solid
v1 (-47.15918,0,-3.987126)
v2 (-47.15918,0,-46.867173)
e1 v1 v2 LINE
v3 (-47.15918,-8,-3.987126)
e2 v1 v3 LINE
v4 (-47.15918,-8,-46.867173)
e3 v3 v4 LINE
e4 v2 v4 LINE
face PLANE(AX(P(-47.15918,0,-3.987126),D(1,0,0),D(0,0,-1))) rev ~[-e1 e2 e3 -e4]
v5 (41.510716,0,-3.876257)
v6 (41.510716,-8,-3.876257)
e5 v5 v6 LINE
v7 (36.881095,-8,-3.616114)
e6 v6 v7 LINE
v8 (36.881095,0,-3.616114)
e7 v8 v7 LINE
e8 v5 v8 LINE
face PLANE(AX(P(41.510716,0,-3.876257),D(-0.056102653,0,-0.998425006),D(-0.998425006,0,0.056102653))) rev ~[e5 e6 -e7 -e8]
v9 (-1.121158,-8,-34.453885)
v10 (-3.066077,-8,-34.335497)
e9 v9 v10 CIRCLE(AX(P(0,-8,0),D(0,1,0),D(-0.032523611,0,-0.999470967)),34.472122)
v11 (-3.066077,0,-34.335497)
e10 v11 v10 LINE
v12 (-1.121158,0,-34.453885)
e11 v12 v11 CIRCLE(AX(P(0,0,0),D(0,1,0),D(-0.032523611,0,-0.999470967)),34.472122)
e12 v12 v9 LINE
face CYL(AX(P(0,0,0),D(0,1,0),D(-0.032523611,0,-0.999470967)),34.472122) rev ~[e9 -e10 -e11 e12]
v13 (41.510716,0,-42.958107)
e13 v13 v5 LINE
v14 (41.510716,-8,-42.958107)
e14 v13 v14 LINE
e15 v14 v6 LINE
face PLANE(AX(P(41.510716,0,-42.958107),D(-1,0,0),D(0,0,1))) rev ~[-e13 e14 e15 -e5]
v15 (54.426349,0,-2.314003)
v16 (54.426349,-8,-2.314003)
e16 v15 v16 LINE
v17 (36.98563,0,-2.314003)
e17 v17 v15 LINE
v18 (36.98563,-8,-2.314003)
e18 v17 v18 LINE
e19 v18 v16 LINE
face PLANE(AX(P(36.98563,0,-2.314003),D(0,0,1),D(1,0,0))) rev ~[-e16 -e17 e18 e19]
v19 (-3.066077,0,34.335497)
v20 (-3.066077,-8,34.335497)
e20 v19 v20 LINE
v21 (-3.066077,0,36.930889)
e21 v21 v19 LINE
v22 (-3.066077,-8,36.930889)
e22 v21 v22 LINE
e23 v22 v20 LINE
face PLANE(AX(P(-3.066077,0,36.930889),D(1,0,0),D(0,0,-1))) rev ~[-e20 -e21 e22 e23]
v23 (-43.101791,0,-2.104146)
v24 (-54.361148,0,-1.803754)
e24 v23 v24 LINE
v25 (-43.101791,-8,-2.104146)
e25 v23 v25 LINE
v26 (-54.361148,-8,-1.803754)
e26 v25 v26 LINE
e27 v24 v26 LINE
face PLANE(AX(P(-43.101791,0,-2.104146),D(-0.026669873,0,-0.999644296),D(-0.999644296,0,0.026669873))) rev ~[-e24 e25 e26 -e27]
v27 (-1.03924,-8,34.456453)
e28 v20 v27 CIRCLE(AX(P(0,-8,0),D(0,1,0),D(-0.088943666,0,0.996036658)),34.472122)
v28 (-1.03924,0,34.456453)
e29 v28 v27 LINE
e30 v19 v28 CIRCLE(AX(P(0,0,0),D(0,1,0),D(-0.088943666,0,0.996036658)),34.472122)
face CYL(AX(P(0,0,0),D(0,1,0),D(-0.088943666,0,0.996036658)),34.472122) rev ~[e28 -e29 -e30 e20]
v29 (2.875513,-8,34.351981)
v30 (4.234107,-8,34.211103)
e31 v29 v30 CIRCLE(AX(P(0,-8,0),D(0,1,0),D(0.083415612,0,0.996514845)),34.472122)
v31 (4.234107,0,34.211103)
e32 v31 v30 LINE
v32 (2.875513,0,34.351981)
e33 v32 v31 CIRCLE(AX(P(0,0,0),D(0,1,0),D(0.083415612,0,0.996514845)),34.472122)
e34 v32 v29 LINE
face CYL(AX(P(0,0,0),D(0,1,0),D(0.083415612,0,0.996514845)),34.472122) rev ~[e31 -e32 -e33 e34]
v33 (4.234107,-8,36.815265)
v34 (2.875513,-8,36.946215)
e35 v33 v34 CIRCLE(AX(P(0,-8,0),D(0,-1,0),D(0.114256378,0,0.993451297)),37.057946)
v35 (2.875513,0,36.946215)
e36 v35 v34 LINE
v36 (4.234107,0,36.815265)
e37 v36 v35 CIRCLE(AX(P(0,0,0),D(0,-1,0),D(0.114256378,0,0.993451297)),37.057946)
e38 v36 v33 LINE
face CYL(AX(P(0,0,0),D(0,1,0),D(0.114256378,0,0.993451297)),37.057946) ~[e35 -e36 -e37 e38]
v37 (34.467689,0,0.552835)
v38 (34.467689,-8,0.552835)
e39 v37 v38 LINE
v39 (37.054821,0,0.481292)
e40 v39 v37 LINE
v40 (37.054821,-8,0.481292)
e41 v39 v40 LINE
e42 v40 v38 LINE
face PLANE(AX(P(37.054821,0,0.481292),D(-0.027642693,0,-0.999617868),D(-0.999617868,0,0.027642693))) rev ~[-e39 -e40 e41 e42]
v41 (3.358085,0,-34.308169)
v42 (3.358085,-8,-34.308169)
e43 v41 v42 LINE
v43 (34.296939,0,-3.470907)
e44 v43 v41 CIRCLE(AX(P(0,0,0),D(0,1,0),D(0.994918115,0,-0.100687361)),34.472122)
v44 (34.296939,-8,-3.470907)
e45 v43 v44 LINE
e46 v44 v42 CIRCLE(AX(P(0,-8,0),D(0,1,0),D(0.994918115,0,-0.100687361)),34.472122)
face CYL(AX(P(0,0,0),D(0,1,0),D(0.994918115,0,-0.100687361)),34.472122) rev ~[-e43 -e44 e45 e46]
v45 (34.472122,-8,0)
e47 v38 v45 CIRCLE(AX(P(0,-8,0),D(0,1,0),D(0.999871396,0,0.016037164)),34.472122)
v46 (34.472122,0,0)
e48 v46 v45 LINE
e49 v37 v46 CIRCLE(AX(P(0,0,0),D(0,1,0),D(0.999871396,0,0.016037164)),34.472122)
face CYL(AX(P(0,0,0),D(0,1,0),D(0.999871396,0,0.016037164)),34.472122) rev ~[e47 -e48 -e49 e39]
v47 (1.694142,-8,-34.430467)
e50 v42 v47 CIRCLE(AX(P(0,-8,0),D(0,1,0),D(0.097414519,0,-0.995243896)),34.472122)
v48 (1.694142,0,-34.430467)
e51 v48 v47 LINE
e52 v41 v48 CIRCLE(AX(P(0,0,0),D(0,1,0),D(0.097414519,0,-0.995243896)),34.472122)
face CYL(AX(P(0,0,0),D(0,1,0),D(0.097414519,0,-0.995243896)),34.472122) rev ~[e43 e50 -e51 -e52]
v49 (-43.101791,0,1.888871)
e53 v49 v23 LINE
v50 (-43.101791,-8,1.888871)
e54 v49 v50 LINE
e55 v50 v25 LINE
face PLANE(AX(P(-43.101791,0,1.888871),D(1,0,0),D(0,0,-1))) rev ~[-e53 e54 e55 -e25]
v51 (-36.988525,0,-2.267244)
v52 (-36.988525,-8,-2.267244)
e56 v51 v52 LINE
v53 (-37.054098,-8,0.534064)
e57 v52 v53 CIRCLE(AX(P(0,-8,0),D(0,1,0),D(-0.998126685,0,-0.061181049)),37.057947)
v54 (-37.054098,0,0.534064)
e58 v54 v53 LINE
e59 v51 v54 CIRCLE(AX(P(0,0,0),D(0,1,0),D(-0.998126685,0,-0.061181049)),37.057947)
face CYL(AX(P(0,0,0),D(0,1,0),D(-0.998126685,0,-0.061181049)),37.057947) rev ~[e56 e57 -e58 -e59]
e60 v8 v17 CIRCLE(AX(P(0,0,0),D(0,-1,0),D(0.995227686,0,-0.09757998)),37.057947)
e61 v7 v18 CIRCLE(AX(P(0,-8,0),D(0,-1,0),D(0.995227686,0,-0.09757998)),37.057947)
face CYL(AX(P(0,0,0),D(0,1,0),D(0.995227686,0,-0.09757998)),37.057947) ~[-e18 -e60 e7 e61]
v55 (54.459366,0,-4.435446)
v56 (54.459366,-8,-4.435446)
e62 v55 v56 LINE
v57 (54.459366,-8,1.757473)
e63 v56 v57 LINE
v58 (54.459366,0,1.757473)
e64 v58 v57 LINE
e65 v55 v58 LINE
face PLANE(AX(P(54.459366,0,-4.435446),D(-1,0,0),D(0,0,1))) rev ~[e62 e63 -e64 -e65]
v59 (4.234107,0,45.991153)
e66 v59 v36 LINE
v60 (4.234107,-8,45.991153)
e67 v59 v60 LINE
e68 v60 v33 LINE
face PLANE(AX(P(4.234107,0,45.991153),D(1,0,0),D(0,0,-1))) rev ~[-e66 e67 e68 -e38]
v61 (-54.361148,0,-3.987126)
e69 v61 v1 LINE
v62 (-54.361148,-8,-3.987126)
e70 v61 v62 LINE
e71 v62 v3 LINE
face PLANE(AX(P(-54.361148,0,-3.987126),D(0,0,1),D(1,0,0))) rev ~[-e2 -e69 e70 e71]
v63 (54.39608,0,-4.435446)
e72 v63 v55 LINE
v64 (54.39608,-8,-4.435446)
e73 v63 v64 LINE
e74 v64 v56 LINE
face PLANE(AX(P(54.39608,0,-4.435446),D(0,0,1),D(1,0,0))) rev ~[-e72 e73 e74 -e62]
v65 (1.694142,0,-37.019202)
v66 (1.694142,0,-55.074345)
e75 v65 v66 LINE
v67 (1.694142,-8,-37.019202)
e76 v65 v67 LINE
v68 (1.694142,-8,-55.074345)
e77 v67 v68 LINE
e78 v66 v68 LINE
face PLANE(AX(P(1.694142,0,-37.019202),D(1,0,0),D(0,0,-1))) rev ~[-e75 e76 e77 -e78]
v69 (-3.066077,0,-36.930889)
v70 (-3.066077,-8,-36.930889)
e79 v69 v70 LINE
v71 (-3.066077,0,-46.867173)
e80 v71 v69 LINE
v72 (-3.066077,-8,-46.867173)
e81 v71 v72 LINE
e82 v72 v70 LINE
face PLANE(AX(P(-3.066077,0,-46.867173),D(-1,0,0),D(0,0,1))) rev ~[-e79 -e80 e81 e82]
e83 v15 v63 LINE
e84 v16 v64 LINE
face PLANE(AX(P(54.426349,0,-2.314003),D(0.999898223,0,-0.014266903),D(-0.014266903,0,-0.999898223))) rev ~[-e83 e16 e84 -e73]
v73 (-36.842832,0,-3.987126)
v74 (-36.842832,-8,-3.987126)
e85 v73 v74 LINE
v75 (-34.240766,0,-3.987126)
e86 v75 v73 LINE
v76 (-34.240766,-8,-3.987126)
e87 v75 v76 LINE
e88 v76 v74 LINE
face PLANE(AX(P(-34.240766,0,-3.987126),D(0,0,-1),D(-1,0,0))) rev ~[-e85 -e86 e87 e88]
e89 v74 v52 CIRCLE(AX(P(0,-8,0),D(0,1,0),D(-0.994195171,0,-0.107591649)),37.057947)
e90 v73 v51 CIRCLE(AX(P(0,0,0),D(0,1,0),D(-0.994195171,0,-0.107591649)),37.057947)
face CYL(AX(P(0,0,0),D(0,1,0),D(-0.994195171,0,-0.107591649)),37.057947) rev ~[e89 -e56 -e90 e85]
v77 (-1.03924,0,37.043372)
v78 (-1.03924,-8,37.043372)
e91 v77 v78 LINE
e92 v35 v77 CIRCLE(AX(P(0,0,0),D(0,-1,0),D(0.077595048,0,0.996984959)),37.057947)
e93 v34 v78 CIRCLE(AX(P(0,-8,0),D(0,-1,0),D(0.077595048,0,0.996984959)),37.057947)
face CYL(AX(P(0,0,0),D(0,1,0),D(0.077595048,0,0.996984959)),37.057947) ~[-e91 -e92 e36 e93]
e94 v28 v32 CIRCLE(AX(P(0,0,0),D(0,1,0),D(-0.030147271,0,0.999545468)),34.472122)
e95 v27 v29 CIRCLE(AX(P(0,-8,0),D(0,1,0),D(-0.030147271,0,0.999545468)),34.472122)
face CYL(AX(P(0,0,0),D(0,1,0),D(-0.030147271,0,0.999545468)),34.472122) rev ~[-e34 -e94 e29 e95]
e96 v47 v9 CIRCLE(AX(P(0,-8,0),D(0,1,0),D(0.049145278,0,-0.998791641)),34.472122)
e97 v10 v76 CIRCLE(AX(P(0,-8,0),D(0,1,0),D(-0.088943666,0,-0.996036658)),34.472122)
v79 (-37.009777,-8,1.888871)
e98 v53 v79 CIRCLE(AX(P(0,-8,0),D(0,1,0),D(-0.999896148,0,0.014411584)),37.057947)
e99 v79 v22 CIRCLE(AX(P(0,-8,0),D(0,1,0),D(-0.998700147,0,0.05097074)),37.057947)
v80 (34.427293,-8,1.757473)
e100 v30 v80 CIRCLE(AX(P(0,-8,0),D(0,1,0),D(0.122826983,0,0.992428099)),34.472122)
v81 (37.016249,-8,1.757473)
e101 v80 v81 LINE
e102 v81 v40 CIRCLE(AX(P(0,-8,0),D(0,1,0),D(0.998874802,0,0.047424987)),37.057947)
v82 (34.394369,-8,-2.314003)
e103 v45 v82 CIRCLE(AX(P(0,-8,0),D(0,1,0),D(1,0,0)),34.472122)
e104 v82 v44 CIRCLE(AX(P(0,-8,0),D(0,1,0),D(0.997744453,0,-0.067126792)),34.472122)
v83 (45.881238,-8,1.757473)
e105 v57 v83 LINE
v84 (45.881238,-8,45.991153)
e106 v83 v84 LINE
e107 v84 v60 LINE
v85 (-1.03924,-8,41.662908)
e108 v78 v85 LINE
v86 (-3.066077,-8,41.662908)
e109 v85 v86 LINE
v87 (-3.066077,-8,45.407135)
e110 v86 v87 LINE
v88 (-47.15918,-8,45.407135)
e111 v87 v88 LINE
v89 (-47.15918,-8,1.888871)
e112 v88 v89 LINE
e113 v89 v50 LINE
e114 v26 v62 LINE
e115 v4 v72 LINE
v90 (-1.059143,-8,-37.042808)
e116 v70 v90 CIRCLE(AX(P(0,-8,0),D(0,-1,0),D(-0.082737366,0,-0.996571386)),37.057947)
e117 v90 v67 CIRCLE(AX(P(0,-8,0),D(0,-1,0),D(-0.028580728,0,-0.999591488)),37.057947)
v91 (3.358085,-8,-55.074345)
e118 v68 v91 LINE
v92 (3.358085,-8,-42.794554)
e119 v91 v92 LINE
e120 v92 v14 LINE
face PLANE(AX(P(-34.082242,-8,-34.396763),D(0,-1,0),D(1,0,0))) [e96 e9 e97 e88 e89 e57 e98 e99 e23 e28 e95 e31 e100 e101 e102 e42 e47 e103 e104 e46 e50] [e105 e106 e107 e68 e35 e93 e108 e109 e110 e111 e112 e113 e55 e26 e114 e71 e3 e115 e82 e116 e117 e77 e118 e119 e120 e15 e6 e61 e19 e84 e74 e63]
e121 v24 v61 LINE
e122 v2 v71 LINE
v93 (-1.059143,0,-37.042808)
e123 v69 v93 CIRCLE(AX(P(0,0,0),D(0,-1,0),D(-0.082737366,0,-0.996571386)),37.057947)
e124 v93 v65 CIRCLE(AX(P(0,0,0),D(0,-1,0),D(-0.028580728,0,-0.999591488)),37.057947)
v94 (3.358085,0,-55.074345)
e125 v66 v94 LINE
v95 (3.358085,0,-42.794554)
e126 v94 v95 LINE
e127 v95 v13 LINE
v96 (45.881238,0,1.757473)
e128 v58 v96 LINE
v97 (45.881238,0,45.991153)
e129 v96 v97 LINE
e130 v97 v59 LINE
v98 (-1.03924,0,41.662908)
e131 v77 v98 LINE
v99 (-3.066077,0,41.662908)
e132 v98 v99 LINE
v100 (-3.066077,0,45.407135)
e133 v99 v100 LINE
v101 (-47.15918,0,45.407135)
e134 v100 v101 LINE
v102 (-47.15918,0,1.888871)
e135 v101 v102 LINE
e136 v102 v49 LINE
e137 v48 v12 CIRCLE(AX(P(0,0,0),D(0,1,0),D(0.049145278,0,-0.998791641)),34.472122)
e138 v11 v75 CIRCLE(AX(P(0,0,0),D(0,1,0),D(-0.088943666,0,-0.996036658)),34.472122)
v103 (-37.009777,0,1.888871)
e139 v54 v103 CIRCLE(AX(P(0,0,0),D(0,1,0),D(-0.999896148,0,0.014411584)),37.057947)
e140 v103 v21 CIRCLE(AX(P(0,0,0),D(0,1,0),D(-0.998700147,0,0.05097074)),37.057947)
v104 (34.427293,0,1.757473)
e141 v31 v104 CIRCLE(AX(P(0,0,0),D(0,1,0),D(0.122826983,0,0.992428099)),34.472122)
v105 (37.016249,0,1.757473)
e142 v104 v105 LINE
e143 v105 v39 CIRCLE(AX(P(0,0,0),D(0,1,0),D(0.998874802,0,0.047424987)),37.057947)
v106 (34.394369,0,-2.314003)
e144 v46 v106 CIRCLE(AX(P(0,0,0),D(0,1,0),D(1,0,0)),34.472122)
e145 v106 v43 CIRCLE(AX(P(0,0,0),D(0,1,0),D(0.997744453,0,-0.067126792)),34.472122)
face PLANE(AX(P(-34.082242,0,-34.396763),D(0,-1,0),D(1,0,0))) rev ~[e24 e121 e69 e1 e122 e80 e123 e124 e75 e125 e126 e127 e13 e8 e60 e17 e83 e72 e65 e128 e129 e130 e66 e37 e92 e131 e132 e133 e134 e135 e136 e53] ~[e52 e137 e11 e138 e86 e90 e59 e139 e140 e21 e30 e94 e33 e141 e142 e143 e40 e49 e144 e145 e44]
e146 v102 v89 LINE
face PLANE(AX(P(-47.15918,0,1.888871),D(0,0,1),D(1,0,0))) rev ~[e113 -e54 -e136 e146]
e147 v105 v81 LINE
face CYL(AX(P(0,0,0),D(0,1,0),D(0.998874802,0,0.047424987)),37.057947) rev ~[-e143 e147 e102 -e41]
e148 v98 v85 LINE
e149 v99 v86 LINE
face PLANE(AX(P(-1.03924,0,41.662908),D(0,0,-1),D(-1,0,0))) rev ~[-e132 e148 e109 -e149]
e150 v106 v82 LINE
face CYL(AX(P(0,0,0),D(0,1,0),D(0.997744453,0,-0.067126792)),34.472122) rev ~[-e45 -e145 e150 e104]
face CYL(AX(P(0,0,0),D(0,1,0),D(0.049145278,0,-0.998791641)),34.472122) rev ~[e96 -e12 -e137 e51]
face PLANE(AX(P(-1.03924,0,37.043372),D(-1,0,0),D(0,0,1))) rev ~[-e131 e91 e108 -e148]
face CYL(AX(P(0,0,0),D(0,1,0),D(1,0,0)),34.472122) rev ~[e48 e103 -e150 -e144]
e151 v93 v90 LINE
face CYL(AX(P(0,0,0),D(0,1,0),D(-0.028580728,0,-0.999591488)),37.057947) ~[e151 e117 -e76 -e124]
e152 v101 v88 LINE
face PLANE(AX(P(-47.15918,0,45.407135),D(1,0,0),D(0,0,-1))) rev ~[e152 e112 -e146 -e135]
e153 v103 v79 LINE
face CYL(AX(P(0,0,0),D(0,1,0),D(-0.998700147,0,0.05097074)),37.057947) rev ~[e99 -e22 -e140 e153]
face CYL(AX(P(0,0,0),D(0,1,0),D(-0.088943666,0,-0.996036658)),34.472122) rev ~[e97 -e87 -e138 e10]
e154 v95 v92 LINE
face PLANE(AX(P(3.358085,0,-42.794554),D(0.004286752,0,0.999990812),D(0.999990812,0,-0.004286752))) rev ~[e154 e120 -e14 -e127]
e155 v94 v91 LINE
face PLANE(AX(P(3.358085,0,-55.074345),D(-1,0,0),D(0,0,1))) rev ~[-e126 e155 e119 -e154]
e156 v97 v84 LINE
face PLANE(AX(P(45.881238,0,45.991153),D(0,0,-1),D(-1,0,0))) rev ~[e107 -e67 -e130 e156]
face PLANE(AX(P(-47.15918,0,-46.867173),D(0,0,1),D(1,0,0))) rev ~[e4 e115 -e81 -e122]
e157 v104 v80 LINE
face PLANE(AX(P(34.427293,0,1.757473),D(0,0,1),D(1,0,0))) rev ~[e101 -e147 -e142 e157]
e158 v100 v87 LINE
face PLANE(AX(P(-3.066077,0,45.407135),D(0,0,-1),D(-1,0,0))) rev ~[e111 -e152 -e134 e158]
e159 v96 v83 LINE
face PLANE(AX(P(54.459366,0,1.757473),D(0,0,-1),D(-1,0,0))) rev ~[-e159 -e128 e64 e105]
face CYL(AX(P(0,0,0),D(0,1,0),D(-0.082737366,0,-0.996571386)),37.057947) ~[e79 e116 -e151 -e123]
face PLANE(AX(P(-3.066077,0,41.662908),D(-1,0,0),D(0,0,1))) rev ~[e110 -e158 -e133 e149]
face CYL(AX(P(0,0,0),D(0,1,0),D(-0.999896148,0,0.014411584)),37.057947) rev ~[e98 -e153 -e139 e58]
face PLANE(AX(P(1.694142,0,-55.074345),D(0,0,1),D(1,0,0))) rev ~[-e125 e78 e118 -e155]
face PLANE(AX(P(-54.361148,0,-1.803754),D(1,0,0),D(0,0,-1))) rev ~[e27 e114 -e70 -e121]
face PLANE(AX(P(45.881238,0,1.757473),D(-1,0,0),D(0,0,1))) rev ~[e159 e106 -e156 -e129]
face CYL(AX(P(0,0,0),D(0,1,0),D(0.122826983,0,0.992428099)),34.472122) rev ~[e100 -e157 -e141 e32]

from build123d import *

# Parameters (mm, degrees)
F1_DEPTH = 8


with BuildPart() as f1:
    # F0 (on Front) → F1 (new body)
    with BuildSketch(Plane.XZ):
        Polygon((-47.1591800451, -3.9871255867), (-47.1591800451, -46.8671731651), (-3.0660768971, -46.8671731651), (-3.0660768971, -42.9581068456), (-43.1017912924, -42.9581068456), (-43.1017912924, -3.9871255867), align=None)
        Polygon((-54.3611483469, -3.9871255867), (-47.1591800451, -3.9871255867), (-43.1017912924, -3.9871255867), (-43.1017912924, -2.1041460184), (-54.3611483469, -1.8037535483), align=None)
        with BuildLine():
            Line((-43.1017912924, -42.9581068456), (-3.0660768971, -42.9581068456))
            Line((-3.0660768971, -42.9581068456), (-3.0660768971, -36.9308893154))
            ThreePointArc((-3.0660768971, -36.9308893154), (-25.8747586881, -26.5290081986), (-36.8428316328, -3.9871255867))
            Line((-36.8428316328, -3.9871255867), (-43.1017912924, -3.9871255867))
            Line((-43.1017912924, -3.9871255867), (-43.1017912924, -42.9581068456))
        make_face()
        with BuildLine():
            Line((-43.1017912924, -2.1041460184), (-43.1017912924, -3.9871255867))
            Line((-43.1017912924, -3.9871255867), (-36.8428316328, -3.9871255867))
            ThreePointArc((-36.8428316328, -3.9871255867), (-36.9256932446, -3.12803318), (-36.9885254852, -2.2672440539))
            Line((-36.9885254852, -2.2672440539), (-43.1017912924, -2.1041460184))
        make_face()
        with BuildLine():
            ThreePointArc((-36.8428316328, -3.9871255867), (-25.8747586881, -26.5290081986), (-3.0660768971, -36.9308893154))
            Line((-3.0660768971, -36.9308893154), (-3.0660768971, -34.3354971844))
            ThreePointArc((-3.0660768971, -34.3354971844), (-24.0459151958, -24.7006306971), (-34.2407655288, -3.9871255867))
            Line((-34.2407655288, -3.9871255867), (-36.8428316328, -3.9871255867))
        make_face()
        with BuildLine():
            Line((-3.0660768971, -34.3354971844), (-3.0660768971, -36.9308893154))
            ThreePointArc((-3.0660768971, -36.9308893154), (-2.0633689571, -37.0004583987), (-1.0591430979, -37.0428080613))
            Line((-1.0591430979, -37.0428080613), (-1.1211578882, -34.4538851137))
            ThreePointArc((-1.1211578882, -34.4538851137), (-2.0944540368, -34.4084358367), (-3.0660768971, -34.3354971844))
        make_face()
        with BuildLine():
            Line((-43.1017912924, 0.534063729), (-43.1017912924, -2.1041460184))
            Line((-43.1017912924, -2.1041460184), (-36.9885254852, -2.2672440539))
            ThreePointArc((-36.9885254852, -2.2672440539), (-37.0477983113, -0.867210155), (-37.0540981418, 0.534063729))
            Line((-37.0540981418, 0.534063729), (-43.1017912924, 0.534063729))
        make_face()
        with BuildLine():
            Line((-1.1211578882, -34.4538851137), (-1.0591430979, -37.0428080613))
            ThreePointArc((-1.0591430979, -37.0428080613), (0.3177187709, -37.0565846774), (1.6941420035, -37.0192017207))
            Line((1.6941420035, -37.0192017207), (1.6941420035, -34.4304672828))
            ThreePointArc((1.6941420035, -34.4304672828), (0.2867312292, -34.4709294862), (-1.1211578882, -34.4538851137))
        make_face()
        with BuildLine():
            Line((-43.1017912924, 1.8888709601), (-43.1017912924, 0.534063729))
            Line((-43.1017912924, 0.534063729), (-37.0540981418, 0.534063729))
            ThreePointArc((-37.0540981418, 0.534063729), (-37.0381326331, 1.2116700136), (-37.0097768119, 1.8888709601))
            Line((-37.0097768119, 1.8888709601), (-43.1017912924, 1.8888709601))
        make_face()
        with BuildLine():
            ThreePointArc((3.3580851741, -36.9054830226), (2.5267534207, -36.9717044551), (1.6941420035, -37.0192017207))
            Line((1.6941420035, -37.0192017207), (1.6941420035, -55.0743453205))
            Line((1.6941420035, -55.0743453205), (3.3580851741, -55.0743453205))
            Line((3.3580851741, -55.0743453205), (3.3580851741, -46.8671731651))
            Line((3.3580851741, -46.8671731651), (3.3580851741, -42.7945544943))
            Line((3.3580851741, -42.7945544943), (3.3580851741, -36.9054830226))
        make_face()
        with BuildLine():
            Line((1.6941420035, -34.4304672828), (1.6941420035, -37.0192017207))
            ThreePointArc((1.6941420035, -37.0192017207), (2.5267534207, -36.9717044551), (3.3580851741, -36.9054830226))
            Line((3.3580851741, -36.9054830226), (3.3580851741, -34.3081689748))
            ThreePointArc((3.3580851741, -34.3081689748), (2.5268535934, -34.3793863435), (1.6941420035, -34.4304672828))
        make_face()
        Polygon((-47.1591800451, 1.8888709601), (-43.1017912924, 1.8888709601), (-43.1017912924, 41.1945804954), (-43.1017912924, 41.6629081592), (-3.0660768971, 41.6629081592), (-3.0660768971, 45.4071350396), (-47.1591800451, 45.4071350396), align=None)
        with BuildLine():
            Line((-43.1017912924, 41.1945804954), (-43.1017912924, 1.8888709601))
            Line((-43.1017912924, 1.8888709601), (-37.0097768119, 1.8888709601))
            ThreePointArc((-37.0097768119, 1.8888709601), (-26.6177436164, 25.7834663678), (-3.0660768971, 36.9308893154))
            Line((-3.0660768971, 36.9308893154), (-3.0660768971, 41.6629081592))
            Line((-3.0660768971, 41.6629081592), (-43.1017912924, 41.6629081592))
            Line((-43.1017912924, 41.6629081592), (-43.1017912924, 41.1945804954))
        make_face()
        with BuildLine():
            ThreePointArc((36.8810945474, -3.6161136812), (26.1121317389, -26.295398632), (3.3580851741, -36.9054830226))
            Line((3.3580851741, -36.9054830226), (3.3580851741, -42.7945544943))
            Line((3.3580851741, -42.7945544943), (41.5107160807, -42.9581068456))
            Line((41.5107160807, -42.9581068456), (41.5107160807, -3.876257455))
            Line((41.5107160807, -3.876257455), (36.8810945474, -3.6161136813))
        make_face()
        with BuildLine():
            Line((3.3580851741, -34.3081689748), (3.3580851741, -36.9054830226))
            ThreePointArc((3.3580851741, -36.9054830226), (26.1121317389, -26.295398632), (36.8810945474, -3.6161136812))
            Line((36.8810945474, -3.6161136813), (34.2969386269, -3.4709069795))
            ThreePointArc((34.2969386269, -3.4709069795), (24.3353526008, -24.4155239189), (3.3580851741, -34.3081689748))
        make_face()
        with BuildLine():
            Line((34.2969386269, -3.4709069795), (36.8810945474, -3.6161136813))
            ThreePointArc((36.8810945474, -3.6161136812), (36.9391000222, -2.9655189628), (36.9856296892, -2.3140029516))
            Line((36.9856296892, -2.3140029516), (34.3943685039, -2.3140029516))
            ThreePointArc((34.3943685039, -2.3140029516), (34.3505243856, -2.8928651668), (34.2969386269, -3.4709069795))
        make_face()
        with BuildLine():
            ThreePointArc((-1.0392403929, 37.0433717765), (-2.0534289831, 37.0010113724), (-3.0660768971, 36.9308893154))
            Line((-3.0660768971, 36.9308893154), (-3.0660768971, 34.3354971844))
            ThreePointArc((-3.0660768971, 34.3354971844), (-2.0535493927, 34.4109013153), (-1.0392403929, 34.4564532976))
            Line((-1.0392403929, 34.4564532976), (-1.0392403929, 37.0433717765))
        make_face()
        with BuildLine():
            Line((-3.0660768971, 41.6629081592), (-3.0660768971, 36.9308893154))
            ThreePointArc((-3.0660768971, 36.9308893154), (-2.0534289831, 37.0010113724), (-1.0392403929, 37.0433717765))
            Line((-1.0392403929, 37.0433717765), (-1.0392403929, 41.6629081592))
            Line((-1.0392403929, 41.6629081592), (-3.0660768971, 41.6629081592))
        make_face()
        with BuildLine():
            Line((34.3943685039, -2.3140029516), (36.9856296892, -2.3140029516))
            ThreePointArc((36.9856296892, -2.3140029516), (37.0398630305, -1.157566349), (37.0579466939, 0))
            ThreePointArc((37.0579466939, 0), (37.0571653007, 0.2406512887), (37.0548211541, 0.4812924287))
            Line((37.0548211541, 0.4812924287), (34.4676887508, 0.5528350755))
            ThreePointArc((34.4676887508, 0.5528350755), (34.4710136618, 0.2764264252), (34.4721219892, 0))
            ThreePointArc((34.4721219892, 0), (34.4526781343, -1.1576544459), (34.3943685039, -2.3140029516))
        make_face()
        with BuildLine():
            ThreePointArc((37.0579466939, 0), (37.0398630305, -1.157566349), (36.9856296892, -2.3140029516))
            Line((36.9856296892, -2.3140029516), (54.4263494667, -2.3140029516))
            Line((54.4263494667, -2.3140029516), (54.4593664818, 0))
            Line((54.4593664818, 0), (45.8812378347, 0.2372132275))
            Line((45.8812378347, 0.2372132275), (37.0548211541, 0.4812924287))
            ThreePointArc((37.0548211541, 0.4812924287), (37.0571653007, 0.2406512887), (37.0579466939, 0))
        make_face()
        with BuildLine():
            ThreePointArc((2.8755131643, 36.9462154653), (0.919420611, 37.0465393648), (-1.0392403929, 37.0433717765))
            Line((-1.0392403929, 37.0433717765), (-1.0392403929, 34.4564532976))
            ThreePointArc((-1.0392403929, 34.4564532976), (0.9196211301, 34.4598533284), (2.8755131643, 34.351981289))
            Line((2.8755131643, 34.351981289), (2.8755131643, 36.9462154653))
        make_face()
        Polygon((54.4593664818, 0), (54.4263494667, -2.3140029516), (54.3960799696, -4.4354456477), (54.4593664818, -4.4354456477), align=None)
        with BuildLine():
            ThreePointArc((4.2341067456, 36.8152652202), (3.5554128885, 36.886995708), (2.8755131643, 36.9462154653))
            Line((2.8755131643, 36.9462154653), (2.8755131643, 34.351981289))
            ThreePointArc((2.8755131643, 34.351981289), (3.555507773, 34.2882714484), (4.2341067456, 34.2111025035))
            Line((4.2341067456, 34.2111025035), (4.2341067456, 36.8152652202))
        make_face()
        with BuildLine():
            ThreePointArc((37.0162491765, 1.7574726371), (37.0410316266, 1.119548661), (37.0548211541, 0.4812924287))
            Line((37.0548211541, 0.4812924287), (45.8812378347, 0.2372132275))
            Line((45.8812378347, 0.2372132275), (45.8812378347, 1.7574726371))
            Line((45.8812378347, 1.7574726371), (41.5107160807, 1.7574726371))
            Line((41.5107160807, 1.7574726371), (37.0162491765, 1.7574726371))
        make_face()
        Polygon((45.8812378347, 0.2372132275), (54.4593664818, 0), (54.4593664818, 1.7574726371), (45.8812378347, 1.7574726371), align=None)
        with BuildLine():
            ThreePointArc((37.0162491765, 1.7574726371), (27.0676960808, 25.3106942229), (4.2341067456, 36.8152652202))
            Line((4.2341067456, 36.8152652202), (4.2341067456, 34.2111025035))
            ThreePointArc((4.2341067456, 34.2111025035), (25.2385711785, 23.4806669264), (34.427292725, 1.7574726371))
            Line((34.427292725, 1.7574726371), (37.0162491765, 1.7574726371))
        make_face()
        with BuildLine():
            Line((4.2341067456, 41.2198267877), (4.2341067456, 36.8152652202))
            ThreePointArc((4.2341067456, 36.8152652202), (27.0676960808, 25.3106942229), (37.0162491765, 1.7574726371))
            Line((37.0162491765, 1.7574726371), (41.5107160807, 1.7574726371))
            Line((41.5107160807, 1.7574726371), (41.5107160807, 41.2198267877))
            Line((41.5107160807, 41.2198267877), (4.2341067456, 41.2198267877))
        make_face()
        Polygon((4.2341067456, 45.9911525249), (4.2341067456, 41.2198267877), (41.5107160807, 41.2198267877), (41.5107160807, 1.7574726371), (45.8812378347, 1.7574726371), (45.8812378347, 45.9911525249), align=None)
    extrude(amount=F1_DEPTH)


solid = f1.part
